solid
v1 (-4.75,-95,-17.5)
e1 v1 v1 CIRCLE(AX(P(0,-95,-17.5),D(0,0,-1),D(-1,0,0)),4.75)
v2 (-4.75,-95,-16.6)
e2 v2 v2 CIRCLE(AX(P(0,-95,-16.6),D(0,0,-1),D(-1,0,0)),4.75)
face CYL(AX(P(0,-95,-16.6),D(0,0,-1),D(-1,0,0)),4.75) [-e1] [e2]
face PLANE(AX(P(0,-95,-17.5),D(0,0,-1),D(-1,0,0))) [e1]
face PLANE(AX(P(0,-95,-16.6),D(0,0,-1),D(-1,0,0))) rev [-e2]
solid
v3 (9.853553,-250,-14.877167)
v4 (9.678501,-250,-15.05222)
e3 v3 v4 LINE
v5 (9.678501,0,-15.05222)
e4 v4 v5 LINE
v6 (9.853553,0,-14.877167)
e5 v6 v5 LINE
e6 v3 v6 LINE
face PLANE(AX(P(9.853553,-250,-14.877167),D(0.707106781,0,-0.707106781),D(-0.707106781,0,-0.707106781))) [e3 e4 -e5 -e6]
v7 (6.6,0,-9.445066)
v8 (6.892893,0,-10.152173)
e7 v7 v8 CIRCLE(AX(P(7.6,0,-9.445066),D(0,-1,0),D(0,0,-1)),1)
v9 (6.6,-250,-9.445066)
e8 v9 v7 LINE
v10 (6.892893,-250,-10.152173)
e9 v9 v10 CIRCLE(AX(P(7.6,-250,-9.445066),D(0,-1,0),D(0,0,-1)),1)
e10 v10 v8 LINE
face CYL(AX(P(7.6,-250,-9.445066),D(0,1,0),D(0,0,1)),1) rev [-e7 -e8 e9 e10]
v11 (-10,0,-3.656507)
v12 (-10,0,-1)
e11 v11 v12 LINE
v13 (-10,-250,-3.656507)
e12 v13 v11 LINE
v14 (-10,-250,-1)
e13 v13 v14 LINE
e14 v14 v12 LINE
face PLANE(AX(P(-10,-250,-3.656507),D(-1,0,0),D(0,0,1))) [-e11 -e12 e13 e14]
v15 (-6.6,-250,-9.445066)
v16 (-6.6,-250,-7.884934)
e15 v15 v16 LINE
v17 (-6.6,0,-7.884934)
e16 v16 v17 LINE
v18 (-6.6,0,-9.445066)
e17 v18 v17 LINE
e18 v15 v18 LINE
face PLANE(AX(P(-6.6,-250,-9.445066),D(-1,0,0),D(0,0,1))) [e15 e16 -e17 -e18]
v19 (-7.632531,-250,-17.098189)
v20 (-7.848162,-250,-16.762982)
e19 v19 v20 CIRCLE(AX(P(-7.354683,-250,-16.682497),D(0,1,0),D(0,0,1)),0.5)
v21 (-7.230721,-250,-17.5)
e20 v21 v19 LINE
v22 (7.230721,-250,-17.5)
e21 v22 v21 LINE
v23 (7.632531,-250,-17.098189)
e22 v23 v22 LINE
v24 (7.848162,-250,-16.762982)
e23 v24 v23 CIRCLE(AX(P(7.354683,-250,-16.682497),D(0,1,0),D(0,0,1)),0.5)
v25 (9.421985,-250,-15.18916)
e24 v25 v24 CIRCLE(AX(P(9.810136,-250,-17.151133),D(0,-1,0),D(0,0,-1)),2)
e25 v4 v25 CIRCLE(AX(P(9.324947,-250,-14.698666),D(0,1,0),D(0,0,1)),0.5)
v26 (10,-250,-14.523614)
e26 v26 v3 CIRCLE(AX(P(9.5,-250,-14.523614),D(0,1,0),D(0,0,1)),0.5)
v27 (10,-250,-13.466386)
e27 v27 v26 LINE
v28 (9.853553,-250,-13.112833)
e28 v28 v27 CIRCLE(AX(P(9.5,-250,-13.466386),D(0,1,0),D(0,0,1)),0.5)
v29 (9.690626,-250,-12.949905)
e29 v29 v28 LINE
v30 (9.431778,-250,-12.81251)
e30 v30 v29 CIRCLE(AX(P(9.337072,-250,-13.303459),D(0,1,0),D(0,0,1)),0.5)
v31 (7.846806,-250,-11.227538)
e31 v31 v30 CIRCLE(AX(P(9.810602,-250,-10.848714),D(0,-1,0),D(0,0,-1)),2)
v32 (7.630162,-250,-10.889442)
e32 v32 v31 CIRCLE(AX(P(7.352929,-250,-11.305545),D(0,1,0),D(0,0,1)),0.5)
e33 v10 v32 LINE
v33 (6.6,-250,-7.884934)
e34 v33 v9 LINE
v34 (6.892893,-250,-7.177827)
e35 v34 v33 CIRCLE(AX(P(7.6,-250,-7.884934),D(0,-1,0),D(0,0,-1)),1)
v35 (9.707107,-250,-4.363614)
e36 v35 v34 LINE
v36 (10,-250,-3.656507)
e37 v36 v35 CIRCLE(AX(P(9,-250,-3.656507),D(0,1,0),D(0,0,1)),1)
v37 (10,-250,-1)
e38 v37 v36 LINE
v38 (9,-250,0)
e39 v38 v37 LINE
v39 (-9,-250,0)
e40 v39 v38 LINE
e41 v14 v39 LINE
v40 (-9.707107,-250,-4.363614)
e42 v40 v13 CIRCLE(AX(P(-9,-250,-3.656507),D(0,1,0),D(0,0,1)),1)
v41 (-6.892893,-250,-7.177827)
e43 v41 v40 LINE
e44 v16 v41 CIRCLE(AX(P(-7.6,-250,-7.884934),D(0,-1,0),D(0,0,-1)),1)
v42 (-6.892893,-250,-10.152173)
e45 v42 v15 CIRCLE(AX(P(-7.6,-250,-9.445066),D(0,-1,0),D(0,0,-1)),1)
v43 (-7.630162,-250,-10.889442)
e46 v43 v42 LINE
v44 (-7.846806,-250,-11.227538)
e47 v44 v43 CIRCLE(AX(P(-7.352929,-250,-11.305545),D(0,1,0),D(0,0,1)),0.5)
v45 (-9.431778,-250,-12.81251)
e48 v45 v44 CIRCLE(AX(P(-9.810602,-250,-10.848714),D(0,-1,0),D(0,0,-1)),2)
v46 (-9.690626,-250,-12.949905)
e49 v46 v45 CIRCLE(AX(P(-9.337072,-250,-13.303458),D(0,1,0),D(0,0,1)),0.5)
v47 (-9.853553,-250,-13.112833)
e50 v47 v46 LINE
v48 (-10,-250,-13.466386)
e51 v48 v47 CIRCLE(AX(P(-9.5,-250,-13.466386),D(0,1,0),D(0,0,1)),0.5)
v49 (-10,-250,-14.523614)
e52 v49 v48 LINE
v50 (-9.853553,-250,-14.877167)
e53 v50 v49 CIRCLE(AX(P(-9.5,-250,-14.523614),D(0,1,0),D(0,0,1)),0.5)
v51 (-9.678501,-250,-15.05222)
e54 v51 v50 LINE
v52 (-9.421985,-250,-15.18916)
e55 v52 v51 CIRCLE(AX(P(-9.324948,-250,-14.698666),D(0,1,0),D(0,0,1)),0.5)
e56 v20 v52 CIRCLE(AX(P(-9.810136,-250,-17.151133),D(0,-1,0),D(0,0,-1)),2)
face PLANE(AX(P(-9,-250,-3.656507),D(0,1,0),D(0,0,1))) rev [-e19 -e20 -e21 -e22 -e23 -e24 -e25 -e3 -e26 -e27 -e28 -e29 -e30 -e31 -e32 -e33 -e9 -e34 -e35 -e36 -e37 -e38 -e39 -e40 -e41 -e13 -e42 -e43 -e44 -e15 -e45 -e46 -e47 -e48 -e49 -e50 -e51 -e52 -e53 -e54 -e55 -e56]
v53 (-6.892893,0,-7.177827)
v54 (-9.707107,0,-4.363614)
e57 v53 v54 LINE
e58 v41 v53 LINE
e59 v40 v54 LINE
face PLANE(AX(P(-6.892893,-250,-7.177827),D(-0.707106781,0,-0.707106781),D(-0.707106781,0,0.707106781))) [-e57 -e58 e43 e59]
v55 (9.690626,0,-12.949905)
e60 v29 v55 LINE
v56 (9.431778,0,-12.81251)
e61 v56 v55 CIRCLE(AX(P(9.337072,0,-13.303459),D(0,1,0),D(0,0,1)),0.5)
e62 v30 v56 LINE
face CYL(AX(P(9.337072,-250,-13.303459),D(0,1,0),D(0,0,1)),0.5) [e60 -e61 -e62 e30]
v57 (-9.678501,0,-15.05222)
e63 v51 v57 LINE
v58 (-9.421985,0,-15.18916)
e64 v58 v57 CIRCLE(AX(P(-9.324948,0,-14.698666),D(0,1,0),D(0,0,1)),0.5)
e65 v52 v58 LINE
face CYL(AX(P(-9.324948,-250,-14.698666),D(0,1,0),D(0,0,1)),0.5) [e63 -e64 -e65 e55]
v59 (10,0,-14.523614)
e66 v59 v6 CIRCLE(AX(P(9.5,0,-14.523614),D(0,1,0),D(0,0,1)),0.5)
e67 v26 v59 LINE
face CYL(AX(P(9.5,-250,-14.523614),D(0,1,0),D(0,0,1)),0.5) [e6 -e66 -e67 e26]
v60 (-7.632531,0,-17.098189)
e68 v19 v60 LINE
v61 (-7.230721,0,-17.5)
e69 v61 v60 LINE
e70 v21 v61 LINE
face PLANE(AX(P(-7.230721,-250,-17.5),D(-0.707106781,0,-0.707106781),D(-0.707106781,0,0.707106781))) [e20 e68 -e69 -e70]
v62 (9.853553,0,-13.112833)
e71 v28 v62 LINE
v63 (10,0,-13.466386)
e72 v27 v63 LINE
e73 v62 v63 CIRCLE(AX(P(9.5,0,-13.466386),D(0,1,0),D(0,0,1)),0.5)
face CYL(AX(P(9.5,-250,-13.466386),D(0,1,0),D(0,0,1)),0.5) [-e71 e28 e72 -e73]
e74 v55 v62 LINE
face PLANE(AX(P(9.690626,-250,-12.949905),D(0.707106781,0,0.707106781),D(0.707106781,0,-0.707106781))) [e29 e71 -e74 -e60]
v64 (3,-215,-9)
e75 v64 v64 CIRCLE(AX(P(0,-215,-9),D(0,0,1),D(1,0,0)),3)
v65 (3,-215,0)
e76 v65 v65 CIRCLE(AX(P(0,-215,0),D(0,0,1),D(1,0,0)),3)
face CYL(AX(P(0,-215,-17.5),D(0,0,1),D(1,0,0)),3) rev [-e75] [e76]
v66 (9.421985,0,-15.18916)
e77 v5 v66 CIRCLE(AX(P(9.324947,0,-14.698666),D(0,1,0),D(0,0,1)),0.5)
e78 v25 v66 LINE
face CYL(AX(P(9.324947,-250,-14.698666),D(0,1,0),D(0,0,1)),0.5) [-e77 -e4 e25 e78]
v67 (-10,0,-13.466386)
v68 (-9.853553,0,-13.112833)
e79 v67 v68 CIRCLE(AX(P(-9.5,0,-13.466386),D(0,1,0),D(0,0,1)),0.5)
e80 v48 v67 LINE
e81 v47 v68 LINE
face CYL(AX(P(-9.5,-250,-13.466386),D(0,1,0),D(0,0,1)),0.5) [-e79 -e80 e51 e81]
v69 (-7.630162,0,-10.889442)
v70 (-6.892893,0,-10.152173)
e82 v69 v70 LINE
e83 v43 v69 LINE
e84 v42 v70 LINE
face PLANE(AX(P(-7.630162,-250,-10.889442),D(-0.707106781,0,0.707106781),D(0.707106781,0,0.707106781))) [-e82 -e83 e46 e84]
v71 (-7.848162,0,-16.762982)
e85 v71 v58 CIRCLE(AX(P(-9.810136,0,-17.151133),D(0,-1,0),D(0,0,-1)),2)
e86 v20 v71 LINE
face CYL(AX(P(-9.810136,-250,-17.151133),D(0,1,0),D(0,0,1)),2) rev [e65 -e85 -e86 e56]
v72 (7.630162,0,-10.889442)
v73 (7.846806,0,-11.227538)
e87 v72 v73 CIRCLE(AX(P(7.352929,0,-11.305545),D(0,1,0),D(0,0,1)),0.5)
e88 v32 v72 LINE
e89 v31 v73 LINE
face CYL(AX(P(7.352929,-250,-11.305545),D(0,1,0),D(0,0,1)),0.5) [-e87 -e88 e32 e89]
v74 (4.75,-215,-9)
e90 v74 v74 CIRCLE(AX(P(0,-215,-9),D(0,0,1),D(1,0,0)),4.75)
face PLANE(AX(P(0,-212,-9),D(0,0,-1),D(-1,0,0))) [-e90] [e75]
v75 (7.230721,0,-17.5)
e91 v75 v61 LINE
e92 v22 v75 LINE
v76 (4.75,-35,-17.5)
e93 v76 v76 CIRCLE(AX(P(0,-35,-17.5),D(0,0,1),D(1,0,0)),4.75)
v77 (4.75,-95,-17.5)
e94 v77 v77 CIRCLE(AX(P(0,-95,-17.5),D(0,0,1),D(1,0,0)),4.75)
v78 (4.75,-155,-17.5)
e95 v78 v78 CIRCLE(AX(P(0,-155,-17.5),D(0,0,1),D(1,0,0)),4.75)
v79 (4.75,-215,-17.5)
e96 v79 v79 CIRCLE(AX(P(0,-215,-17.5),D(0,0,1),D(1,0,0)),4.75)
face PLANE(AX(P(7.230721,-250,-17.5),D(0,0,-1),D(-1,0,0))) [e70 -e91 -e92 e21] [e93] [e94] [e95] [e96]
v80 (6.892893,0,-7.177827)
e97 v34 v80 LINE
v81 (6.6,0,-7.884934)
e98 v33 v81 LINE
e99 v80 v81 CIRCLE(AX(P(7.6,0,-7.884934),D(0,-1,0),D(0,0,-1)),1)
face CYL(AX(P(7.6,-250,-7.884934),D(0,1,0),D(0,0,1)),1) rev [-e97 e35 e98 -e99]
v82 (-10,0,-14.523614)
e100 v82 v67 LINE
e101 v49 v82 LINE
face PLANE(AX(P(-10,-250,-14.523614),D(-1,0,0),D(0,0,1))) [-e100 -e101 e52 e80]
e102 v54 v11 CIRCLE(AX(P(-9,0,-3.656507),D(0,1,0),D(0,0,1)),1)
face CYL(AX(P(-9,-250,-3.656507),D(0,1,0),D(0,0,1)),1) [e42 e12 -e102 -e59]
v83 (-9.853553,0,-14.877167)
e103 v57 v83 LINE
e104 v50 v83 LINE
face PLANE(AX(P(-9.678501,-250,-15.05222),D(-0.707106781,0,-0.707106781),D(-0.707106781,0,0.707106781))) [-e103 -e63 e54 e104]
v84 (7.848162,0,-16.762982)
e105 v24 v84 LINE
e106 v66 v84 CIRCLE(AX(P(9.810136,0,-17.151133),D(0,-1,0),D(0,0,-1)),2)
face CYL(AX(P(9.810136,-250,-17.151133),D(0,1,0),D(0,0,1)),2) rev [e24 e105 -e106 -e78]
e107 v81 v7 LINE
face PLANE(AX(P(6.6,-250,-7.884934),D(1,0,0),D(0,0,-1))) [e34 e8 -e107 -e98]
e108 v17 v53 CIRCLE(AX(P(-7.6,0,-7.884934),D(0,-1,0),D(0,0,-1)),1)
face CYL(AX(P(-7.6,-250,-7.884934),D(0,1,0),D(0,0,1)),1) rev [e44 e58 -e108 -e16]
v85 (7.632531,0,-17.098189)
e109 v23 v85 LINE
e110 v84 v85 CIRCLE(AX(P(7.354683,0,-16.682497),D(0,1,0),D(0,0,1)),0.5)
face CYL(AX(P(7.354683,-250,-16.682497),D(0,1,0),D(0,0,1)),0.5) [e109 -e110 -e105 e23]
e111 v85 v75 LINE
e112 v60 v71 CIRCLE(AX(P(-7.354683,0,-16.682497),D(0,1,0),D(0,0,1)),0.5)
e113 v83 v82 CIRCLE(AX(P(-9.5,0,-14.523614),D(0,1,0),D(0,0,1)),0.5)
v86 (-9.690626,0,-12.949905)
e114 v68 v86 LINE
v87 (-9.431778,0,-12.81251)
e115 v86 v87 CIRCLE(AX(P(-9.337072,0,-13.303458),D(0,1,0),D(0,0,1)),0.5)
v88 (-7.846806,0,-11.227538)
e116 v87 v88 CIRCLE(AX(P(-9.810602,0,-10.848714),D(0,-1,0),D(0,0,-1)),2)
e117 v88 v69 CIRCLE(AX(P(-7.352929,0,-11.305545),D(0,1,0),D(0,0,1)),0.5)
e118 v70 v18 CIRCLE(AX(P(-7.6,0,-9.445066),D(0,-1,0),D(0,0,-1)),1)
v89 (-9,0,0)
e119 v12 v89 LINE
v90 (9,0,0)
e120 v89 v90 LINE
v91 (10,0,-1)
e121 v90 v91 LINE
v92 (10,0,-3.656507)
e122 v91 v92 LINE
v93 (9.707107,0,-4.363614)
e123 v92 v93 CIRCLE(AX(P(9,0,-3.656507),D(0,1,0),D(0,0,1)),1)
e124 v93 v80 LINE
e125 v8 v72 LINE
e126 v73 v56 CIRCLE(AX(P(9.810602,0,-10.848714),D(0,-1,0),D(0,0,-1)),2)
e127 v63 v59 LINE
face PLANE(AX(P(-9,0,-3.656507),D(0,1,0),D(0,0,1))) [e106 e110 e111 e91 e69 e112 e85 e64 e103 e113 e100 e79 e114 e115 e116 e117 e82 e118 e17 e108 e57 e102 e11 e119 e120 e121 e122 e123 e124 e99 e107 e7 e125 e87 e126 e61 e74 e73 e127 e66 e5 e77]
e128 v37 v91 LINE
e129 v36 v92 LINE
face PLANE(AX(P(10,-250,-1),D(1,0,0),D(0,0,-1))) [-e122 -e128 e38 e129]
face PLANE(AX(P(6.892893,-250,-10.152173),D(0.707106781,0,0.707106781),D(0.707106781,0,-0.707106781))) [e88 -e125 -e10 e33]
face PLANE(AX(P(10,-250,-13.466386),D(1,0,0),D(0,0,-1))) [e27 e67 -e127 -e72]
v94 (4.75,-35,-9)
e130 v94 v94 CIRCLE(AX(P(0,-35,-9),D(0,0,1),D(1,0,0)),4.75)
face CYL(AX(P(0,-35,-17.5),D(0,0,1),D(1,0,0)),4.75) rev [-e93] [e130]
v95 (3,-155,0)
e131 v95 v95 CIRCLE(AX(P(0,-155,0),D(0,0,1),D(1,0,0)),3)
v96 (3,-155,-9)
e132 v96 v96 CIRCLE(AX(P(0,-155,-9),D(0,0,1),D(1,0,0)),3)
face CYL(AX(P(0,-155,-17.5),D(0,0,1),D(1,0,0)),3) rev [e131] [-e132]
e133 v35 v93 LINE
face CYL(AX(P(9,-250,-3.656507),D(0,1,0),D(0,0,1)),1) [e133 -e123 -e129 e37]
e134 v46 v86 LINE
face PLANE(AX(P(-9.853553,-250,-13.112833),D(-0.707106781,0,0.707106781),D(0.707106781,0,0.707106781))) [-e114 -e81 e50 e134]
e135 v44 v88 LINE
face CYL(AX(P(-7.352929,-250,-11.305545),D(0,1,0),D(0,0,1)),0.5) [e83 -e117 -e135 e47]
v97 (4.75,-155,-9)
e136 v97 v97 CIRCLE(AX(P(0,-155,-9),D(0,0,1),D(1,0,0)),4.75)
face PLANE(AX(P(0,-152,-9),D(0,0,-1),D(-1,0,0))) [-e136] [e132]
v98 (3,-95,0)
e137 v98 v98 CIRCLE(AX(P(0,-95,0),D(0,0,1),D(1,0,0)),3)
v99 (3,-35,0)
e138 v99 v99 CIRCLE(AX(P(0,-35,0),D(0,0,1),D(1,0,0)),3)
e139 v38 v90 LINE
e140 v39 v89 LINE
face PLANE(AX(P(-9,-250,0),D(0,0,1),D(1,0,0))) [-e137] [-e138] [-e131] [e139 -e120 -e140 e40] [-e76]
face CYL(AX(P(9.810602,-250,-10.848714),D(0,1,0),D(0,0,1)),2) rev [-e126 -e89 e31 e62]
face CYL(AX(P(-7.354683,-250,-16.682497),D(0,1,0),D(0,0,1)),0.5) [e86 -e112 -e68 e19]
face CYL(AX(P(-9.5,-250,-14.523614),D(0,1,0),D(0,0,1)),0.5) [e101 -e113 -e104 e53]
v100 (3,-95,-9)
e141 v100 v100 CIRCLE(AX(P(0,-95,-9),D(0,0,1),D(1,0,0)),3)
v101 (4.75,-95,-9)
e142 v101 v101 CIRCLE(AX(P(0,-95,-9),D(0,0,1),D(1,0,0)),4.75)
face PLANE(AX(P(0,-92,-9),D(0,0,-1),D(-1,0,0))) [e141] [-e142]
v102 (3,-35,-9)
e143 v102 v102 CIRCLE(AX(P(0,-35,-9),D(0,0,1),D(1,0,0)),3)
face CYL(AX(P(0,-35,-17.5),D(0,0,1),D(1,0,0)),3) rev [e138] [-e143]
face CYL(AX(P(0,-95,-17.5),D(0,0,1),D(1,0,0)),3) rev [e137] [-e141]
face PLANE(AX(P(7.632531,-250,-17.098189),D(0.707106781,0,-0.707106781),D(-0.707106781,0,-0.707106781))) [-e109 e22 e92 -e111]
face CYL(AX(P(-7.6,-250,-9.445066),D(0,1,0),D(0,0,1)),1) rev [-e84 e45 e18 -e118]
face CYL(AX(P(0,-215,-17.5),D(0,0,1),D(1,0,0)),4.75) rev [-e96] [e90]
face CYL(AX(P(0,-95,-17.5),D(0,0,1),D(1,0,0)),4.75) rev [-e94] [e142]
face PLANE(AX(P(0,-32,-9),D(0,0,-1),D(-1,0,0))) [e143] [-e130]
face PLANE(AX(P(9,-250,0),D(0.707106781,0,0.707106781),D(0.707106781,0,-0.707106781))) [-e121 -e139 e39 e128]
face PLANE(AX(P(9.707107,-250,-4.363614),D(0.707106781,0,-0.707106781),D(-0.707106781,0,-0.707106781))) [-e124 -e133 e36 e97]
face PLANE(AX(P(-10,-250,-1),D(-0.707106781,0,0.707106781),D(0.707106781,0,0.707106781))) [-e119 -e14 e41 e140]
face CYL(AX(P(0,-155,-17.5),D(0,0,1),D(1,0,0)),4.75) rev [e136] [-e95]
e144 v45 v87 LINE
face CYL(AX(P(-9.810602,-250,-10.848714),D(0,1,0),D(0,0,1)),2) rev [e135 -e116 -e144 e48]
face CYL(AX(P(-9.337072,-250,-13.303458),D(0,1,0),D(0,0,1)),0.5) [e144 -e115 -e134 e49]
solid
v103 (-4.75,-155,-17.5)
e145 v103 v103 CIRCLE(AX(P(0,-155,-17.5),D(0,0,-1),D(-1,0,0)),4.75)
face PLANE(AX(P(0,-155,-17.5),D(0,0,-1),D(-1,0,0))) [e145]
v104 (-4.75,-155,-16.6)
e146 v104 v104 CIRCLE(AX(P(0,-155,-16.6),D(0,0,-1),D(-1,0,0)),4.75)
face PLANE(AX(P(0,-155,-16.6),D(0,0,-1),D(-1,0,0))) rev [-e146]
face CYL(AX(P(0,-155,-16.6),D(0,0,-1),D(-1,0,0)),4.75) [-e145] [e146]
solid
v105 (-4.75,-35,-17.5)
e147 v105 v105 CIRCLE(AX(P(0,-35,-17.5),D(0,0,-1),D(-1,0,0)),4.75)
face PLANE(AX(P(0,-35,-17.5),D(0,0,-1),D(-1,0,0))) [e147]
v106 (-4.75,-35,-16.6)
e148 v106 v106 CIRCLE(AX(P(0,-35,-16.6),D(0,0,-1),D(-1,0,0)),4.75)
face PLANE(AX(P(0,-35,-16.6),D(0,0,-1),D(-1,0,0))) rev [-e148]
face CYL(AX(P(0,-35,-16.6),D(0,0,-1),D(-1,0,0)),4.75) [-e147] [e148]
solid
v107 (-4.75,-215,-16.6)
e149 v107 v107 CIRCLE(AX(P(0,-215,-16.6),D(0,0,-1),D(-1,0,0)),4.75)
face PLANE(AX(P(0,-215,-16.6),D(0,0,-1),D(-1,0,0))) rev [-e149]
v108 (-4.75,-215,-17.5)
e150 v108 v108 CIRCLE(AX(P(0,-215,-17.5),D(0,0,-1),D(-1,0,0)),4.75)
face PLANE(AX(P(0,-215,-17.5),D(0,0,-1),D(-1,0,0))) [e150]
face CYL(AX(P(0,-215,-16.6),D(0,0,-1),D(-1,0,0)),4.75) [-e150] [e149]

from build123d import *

# Parameters (mm, degrees)
EXTRUDE_1_DEPTH              = 250
SKETCH_80_R                  = 4.75
EXTRUDE_12_DEPTH             = 0.9
PATTERN_START                = -17.499999985
PATTERN_LINEAR_1_OUTLINE_R   = 4.75
PATTERN_LINEAR_1_DEPTH       = 0.9
PATTERN_LINEAR_1_2_OUTLINE_R = 4.75
PATTERN_LINEAR_1_2_DEPTH     = 0.9
PATTERN_LINEAR_1_3_OUTLINE_R = 4.75
PATTERN_LINEAR_1_3_DEPTH     = 0.9
PATTERN_LINEAR_1_4_OUTLINE_R = 4.75
PATTERN_LINEAR_1_4_DEPTH     = 8.499999985
PATTERN_START_2              = -9
PATTERN_LINEAR_1_5_OUTLINE_R = 3
PATTERN_LINEAR_1_5_DEPTH     = 9


# Read off the part's stored shape, not the designer's step: Линейный массив1
with BuildPart() as part:
    # Эскиз1 → Бобышка-Вытянуть1 (new body)
    with BuildSketch(Plane(origin=(0, 0, 0), x_dir=(1, 0, 0), z_dir=(0, 1, 0))):
        with BuildLine():
            Line((-10, 3.656507036), (-10, 1))
            Line((-10, 1), (-9, 0))
            Line((-9, 0), (9, 0))
            Line((9, 0), (10, 1))
            Line((10, 1), (10, 3.656507036))
            ThreePointArc((10, 3.656507036), (9.92387953, 4.039190479), (9.707106773, 4.363613837))
            Line((9.707106773, 4.363613837), (6.892893227, 7.177827383))
            ThreePointArc((6.892893227, 7.177827383), (6.67612047, 7.502250741), (6.6, 7.884934184))
            Line((6.6, 7.884934184), (6.6, 9.445065806))
            ThreePointArc((6.6, 9.445065806), (6.67612047, 9.827749249), (6.892893227, 10.152172607))
            Line((6.892893227, 10.152172607), (7.63016236, 10.88944174))
            ThreePointArc((7.63016236, 10.88944174), (7.773916172, 11.035785914), (7.84680643, 11.2275378))
            ThreePointArc((7.84680643, 11.2275378), (8.39638832, 12.26292769), (9.431778202, 12.812509595))
            ThreePointArc((9.431778202, 12.812509595), (9.571493891, 12.861817755), (9.690625709, 12.949905089))
            Line((9.690625709, 12.949905089), (9.85355341, 13.11283279))
            ThreePointArc((9.85355341, 13.11283279), (9.961939771, 13.275044443), (10, 13.466386134))
            Line((10, 13.466386134), (10, 14.523613836))
            ThreePointArc((10, 14.523613836), (9.961939771, 14.714955527), (9.85355341, 14.87716718))
            Line((9.85355341, 14.87716718), (9.678500897, 15.052219693))
            ThreePointArc((9.678500897, 15.052219693), (9.560417661, 15.139748844), (9.421985093, 15.189159641))
            ThreePointArc((9.421985093, 15.189159641), (8.395921978, 15.736919382), (7.84816224, 16.7629825))
            ThreePointArc((7.84816224, 16.7629825), (7.775191486, 16.953000828), (7.632531165, 17.098189425))
            Line((7.632531165, 17.098189425), (7.230720605, 17.499999985))
            Line((7.230720605, 17.499999985), (-7.230720615, 17.499999985))
            Line((-7.230720615, 17.499999985), (-7.632531175, 17.098189425))
            ThreePointArc((-7.632531175, 17.098189425), (-7.775191503, 16.953000832), (-7.84816225, 16.7629825))
            ThreePointArc((-7.84816225, 16.7629825), (-8.395921997, 15.736919373), (-9.421985128, 15.189159636))
            ThreePointArc((-9.421985128, 15.189159636), (-9.560417671, 15.13974885), (-9.678500884, 15.052219716))
            Line((-9.678500884, 15.052219716), (-9.85355341, 14.87716719))
            ThreePointArc((-9.85355341, 14.87716719), (-9.961939771, 14.714955537), (-10, 14.523613846))
            Line((-10, 14.523613846), (-10, 13.466386134))
            ThreePointArc((-10, 13.466386134), (-9.961939771, 13.275044443), (-9.85355341, 13.11283279))
            Line((-9.85355341, 13.11283279), (-9.690625667, 12.949905047))
            ThreePointArc((-9.690625667, 12.949905047), (-9.57149389, 12.861817745), (-9.431778248, 12.812509604))
            ThreePointArc((-9.431778248, 12.812509604), (-8.396388337, 12.262927707), (-7.84680643, 11.2275378))
            ThreePointArc((-7.84680643, 11.2275378), (-7.773916168, 11.035785916), (-7.63016236, 10.88944174))
            Line((-7.63016236, 10.88944174), (-6.892893227, 10.152172607))
            ThreePointArc((-6.892893227, 10.152172607), (-6.67612047, 9.827749249), (-6.6, 9.445065806))
            Line((-6.6, 9.445065806), (-6.6, 7.884934184))
            ThreePointArc((-6.6, 7.884934184), (-6.67612047, 7.502250741), (-6.892893227, 7.177827383))
            Line((-6.892893227, 7.177827383), (-9.707106773, 4.363613837))
            ThreePointArc((-9.707106773, 4.363613837), (-9.92387953, 4.039190479), (-10, 3.656507036))
        make_face()
    extrude(amount=-EXTRUDE_1_DEPTH)

    # Эскиз6 → Вырез-Повернуть1 (revolve, cut)
    with BuildSketch(Plane(origin=(0, 30, 0), x_dir=(0, -1, 0), z_dir=(1, 0, 0)), mode=Mode.PRIVATE) as cut_revolve_1_sk:
        Polygon((60.25, 17.499999985), (65, 17.499999985), (65, 0), (62, 0), (62, 9), (60.25, 9), align=None)
    revolve(cut_revolve_1_sk.sketch.rotate(Axis((0, -35, -17.499999985), (0, 0, 1)), 270), axis=Axis((0, -35, -17.499999985), (0, 0, 1)), mode=Mode.SUBTRACT)

    # Pattern Linear 1 4 outline → Pattern Linear 1 4 (cut)
    with BuildSketch(Plane.XY.offset(PATTERN_START)):
        with Locations((0, -95)):
            Circle(PATTERN_LINEAR_1_4_OUTLINE_R)
        with Locations((0, -155)):
            Circle(PATTERN_LINEAR_1_4_OUTLINE_R)
        with Locations((0, -215)):
            Circle(PATTERN_LINEAR_1_4_OUTLINE_R)
    extrude(amount=PATTERN_LINEAR_1_4_DEPTH, mode=Mode.SUBTRACT)

    # Pattern Linear 1 5 outline → Pattern Linear 1 5 (cut)
    with BuildSketch(Plane.XY.offset(PATTERN_START_2)):
        with Locations((0, -95)):
            Circle(PATTERN_LINEAR_1_5_OUTLINE_R)
        with Locations((0, -155)):
            Circle(PATTERN_LINEAR_1_5_OUTLINE_R)
        with Locations((0, -215)):
            Circle(PATTERN_LINEAR_1_5_OUTLINE_R)
    extrude(amount=PATTERN_LINEAR_1_5_DEPTH, mode=Mode.SUBTRACT)


with BuildPart() as body_2:
    # Эскиз80 → Бобышка-Вытянуть12 (new body)
    with BuildSketch(Plane(origin=(0, 0, -17.499999985), x_dir=(-1, 0, 0), z_dir=(0, 0, -1))):
        with Locations((0, -35)):
            Circle(SKETCH_80_R)
    extrude(amount=-EXTRUDE_12_DEPTH)


with BuildPart() as body_3:
    # Линейный массив1 outline → Линейный массив1 (new body)
    with BuildSketch(Plane.XY.offset(PATTERN_START)):
        with Locations((0, -215)):
            Circle(PATTERN_LINEAR_1_OUTLINE_R)
    extrude(amount=PATTERN_LINEAR_1_DEPTH)


with BuildPart() as body_4:
    # Pattern Linear 1 2 outline → Pattern Linear 1 2 (new body)
    with BuildSketch(Plane.XY.offset(PATTERN_START)):
        with Locations((0, -155)):
            Circle(PATTERN_LINEAR_1_2_OUTLINE_R)
    extrude(amount=PATTERN_LINEAR_1_2_DEPTH)


with BuildPart() as body_5:
    # Pattern Linear 1 3 outline → Pattern Linear 1 3 (new body)
    with BuildSketch(Plane.XY.offset(PATTERN_START)):
        with Locations((0, -95)):
            Circle(PATTERN_LINEAR_1_3_OUTLINE_R)
    extrude(amount=PATTERN_LINEAR_1_3_DEPTH)


solid = Compound([part.part, body_2.part, body_3.part, body_4.part, body_5.part])
